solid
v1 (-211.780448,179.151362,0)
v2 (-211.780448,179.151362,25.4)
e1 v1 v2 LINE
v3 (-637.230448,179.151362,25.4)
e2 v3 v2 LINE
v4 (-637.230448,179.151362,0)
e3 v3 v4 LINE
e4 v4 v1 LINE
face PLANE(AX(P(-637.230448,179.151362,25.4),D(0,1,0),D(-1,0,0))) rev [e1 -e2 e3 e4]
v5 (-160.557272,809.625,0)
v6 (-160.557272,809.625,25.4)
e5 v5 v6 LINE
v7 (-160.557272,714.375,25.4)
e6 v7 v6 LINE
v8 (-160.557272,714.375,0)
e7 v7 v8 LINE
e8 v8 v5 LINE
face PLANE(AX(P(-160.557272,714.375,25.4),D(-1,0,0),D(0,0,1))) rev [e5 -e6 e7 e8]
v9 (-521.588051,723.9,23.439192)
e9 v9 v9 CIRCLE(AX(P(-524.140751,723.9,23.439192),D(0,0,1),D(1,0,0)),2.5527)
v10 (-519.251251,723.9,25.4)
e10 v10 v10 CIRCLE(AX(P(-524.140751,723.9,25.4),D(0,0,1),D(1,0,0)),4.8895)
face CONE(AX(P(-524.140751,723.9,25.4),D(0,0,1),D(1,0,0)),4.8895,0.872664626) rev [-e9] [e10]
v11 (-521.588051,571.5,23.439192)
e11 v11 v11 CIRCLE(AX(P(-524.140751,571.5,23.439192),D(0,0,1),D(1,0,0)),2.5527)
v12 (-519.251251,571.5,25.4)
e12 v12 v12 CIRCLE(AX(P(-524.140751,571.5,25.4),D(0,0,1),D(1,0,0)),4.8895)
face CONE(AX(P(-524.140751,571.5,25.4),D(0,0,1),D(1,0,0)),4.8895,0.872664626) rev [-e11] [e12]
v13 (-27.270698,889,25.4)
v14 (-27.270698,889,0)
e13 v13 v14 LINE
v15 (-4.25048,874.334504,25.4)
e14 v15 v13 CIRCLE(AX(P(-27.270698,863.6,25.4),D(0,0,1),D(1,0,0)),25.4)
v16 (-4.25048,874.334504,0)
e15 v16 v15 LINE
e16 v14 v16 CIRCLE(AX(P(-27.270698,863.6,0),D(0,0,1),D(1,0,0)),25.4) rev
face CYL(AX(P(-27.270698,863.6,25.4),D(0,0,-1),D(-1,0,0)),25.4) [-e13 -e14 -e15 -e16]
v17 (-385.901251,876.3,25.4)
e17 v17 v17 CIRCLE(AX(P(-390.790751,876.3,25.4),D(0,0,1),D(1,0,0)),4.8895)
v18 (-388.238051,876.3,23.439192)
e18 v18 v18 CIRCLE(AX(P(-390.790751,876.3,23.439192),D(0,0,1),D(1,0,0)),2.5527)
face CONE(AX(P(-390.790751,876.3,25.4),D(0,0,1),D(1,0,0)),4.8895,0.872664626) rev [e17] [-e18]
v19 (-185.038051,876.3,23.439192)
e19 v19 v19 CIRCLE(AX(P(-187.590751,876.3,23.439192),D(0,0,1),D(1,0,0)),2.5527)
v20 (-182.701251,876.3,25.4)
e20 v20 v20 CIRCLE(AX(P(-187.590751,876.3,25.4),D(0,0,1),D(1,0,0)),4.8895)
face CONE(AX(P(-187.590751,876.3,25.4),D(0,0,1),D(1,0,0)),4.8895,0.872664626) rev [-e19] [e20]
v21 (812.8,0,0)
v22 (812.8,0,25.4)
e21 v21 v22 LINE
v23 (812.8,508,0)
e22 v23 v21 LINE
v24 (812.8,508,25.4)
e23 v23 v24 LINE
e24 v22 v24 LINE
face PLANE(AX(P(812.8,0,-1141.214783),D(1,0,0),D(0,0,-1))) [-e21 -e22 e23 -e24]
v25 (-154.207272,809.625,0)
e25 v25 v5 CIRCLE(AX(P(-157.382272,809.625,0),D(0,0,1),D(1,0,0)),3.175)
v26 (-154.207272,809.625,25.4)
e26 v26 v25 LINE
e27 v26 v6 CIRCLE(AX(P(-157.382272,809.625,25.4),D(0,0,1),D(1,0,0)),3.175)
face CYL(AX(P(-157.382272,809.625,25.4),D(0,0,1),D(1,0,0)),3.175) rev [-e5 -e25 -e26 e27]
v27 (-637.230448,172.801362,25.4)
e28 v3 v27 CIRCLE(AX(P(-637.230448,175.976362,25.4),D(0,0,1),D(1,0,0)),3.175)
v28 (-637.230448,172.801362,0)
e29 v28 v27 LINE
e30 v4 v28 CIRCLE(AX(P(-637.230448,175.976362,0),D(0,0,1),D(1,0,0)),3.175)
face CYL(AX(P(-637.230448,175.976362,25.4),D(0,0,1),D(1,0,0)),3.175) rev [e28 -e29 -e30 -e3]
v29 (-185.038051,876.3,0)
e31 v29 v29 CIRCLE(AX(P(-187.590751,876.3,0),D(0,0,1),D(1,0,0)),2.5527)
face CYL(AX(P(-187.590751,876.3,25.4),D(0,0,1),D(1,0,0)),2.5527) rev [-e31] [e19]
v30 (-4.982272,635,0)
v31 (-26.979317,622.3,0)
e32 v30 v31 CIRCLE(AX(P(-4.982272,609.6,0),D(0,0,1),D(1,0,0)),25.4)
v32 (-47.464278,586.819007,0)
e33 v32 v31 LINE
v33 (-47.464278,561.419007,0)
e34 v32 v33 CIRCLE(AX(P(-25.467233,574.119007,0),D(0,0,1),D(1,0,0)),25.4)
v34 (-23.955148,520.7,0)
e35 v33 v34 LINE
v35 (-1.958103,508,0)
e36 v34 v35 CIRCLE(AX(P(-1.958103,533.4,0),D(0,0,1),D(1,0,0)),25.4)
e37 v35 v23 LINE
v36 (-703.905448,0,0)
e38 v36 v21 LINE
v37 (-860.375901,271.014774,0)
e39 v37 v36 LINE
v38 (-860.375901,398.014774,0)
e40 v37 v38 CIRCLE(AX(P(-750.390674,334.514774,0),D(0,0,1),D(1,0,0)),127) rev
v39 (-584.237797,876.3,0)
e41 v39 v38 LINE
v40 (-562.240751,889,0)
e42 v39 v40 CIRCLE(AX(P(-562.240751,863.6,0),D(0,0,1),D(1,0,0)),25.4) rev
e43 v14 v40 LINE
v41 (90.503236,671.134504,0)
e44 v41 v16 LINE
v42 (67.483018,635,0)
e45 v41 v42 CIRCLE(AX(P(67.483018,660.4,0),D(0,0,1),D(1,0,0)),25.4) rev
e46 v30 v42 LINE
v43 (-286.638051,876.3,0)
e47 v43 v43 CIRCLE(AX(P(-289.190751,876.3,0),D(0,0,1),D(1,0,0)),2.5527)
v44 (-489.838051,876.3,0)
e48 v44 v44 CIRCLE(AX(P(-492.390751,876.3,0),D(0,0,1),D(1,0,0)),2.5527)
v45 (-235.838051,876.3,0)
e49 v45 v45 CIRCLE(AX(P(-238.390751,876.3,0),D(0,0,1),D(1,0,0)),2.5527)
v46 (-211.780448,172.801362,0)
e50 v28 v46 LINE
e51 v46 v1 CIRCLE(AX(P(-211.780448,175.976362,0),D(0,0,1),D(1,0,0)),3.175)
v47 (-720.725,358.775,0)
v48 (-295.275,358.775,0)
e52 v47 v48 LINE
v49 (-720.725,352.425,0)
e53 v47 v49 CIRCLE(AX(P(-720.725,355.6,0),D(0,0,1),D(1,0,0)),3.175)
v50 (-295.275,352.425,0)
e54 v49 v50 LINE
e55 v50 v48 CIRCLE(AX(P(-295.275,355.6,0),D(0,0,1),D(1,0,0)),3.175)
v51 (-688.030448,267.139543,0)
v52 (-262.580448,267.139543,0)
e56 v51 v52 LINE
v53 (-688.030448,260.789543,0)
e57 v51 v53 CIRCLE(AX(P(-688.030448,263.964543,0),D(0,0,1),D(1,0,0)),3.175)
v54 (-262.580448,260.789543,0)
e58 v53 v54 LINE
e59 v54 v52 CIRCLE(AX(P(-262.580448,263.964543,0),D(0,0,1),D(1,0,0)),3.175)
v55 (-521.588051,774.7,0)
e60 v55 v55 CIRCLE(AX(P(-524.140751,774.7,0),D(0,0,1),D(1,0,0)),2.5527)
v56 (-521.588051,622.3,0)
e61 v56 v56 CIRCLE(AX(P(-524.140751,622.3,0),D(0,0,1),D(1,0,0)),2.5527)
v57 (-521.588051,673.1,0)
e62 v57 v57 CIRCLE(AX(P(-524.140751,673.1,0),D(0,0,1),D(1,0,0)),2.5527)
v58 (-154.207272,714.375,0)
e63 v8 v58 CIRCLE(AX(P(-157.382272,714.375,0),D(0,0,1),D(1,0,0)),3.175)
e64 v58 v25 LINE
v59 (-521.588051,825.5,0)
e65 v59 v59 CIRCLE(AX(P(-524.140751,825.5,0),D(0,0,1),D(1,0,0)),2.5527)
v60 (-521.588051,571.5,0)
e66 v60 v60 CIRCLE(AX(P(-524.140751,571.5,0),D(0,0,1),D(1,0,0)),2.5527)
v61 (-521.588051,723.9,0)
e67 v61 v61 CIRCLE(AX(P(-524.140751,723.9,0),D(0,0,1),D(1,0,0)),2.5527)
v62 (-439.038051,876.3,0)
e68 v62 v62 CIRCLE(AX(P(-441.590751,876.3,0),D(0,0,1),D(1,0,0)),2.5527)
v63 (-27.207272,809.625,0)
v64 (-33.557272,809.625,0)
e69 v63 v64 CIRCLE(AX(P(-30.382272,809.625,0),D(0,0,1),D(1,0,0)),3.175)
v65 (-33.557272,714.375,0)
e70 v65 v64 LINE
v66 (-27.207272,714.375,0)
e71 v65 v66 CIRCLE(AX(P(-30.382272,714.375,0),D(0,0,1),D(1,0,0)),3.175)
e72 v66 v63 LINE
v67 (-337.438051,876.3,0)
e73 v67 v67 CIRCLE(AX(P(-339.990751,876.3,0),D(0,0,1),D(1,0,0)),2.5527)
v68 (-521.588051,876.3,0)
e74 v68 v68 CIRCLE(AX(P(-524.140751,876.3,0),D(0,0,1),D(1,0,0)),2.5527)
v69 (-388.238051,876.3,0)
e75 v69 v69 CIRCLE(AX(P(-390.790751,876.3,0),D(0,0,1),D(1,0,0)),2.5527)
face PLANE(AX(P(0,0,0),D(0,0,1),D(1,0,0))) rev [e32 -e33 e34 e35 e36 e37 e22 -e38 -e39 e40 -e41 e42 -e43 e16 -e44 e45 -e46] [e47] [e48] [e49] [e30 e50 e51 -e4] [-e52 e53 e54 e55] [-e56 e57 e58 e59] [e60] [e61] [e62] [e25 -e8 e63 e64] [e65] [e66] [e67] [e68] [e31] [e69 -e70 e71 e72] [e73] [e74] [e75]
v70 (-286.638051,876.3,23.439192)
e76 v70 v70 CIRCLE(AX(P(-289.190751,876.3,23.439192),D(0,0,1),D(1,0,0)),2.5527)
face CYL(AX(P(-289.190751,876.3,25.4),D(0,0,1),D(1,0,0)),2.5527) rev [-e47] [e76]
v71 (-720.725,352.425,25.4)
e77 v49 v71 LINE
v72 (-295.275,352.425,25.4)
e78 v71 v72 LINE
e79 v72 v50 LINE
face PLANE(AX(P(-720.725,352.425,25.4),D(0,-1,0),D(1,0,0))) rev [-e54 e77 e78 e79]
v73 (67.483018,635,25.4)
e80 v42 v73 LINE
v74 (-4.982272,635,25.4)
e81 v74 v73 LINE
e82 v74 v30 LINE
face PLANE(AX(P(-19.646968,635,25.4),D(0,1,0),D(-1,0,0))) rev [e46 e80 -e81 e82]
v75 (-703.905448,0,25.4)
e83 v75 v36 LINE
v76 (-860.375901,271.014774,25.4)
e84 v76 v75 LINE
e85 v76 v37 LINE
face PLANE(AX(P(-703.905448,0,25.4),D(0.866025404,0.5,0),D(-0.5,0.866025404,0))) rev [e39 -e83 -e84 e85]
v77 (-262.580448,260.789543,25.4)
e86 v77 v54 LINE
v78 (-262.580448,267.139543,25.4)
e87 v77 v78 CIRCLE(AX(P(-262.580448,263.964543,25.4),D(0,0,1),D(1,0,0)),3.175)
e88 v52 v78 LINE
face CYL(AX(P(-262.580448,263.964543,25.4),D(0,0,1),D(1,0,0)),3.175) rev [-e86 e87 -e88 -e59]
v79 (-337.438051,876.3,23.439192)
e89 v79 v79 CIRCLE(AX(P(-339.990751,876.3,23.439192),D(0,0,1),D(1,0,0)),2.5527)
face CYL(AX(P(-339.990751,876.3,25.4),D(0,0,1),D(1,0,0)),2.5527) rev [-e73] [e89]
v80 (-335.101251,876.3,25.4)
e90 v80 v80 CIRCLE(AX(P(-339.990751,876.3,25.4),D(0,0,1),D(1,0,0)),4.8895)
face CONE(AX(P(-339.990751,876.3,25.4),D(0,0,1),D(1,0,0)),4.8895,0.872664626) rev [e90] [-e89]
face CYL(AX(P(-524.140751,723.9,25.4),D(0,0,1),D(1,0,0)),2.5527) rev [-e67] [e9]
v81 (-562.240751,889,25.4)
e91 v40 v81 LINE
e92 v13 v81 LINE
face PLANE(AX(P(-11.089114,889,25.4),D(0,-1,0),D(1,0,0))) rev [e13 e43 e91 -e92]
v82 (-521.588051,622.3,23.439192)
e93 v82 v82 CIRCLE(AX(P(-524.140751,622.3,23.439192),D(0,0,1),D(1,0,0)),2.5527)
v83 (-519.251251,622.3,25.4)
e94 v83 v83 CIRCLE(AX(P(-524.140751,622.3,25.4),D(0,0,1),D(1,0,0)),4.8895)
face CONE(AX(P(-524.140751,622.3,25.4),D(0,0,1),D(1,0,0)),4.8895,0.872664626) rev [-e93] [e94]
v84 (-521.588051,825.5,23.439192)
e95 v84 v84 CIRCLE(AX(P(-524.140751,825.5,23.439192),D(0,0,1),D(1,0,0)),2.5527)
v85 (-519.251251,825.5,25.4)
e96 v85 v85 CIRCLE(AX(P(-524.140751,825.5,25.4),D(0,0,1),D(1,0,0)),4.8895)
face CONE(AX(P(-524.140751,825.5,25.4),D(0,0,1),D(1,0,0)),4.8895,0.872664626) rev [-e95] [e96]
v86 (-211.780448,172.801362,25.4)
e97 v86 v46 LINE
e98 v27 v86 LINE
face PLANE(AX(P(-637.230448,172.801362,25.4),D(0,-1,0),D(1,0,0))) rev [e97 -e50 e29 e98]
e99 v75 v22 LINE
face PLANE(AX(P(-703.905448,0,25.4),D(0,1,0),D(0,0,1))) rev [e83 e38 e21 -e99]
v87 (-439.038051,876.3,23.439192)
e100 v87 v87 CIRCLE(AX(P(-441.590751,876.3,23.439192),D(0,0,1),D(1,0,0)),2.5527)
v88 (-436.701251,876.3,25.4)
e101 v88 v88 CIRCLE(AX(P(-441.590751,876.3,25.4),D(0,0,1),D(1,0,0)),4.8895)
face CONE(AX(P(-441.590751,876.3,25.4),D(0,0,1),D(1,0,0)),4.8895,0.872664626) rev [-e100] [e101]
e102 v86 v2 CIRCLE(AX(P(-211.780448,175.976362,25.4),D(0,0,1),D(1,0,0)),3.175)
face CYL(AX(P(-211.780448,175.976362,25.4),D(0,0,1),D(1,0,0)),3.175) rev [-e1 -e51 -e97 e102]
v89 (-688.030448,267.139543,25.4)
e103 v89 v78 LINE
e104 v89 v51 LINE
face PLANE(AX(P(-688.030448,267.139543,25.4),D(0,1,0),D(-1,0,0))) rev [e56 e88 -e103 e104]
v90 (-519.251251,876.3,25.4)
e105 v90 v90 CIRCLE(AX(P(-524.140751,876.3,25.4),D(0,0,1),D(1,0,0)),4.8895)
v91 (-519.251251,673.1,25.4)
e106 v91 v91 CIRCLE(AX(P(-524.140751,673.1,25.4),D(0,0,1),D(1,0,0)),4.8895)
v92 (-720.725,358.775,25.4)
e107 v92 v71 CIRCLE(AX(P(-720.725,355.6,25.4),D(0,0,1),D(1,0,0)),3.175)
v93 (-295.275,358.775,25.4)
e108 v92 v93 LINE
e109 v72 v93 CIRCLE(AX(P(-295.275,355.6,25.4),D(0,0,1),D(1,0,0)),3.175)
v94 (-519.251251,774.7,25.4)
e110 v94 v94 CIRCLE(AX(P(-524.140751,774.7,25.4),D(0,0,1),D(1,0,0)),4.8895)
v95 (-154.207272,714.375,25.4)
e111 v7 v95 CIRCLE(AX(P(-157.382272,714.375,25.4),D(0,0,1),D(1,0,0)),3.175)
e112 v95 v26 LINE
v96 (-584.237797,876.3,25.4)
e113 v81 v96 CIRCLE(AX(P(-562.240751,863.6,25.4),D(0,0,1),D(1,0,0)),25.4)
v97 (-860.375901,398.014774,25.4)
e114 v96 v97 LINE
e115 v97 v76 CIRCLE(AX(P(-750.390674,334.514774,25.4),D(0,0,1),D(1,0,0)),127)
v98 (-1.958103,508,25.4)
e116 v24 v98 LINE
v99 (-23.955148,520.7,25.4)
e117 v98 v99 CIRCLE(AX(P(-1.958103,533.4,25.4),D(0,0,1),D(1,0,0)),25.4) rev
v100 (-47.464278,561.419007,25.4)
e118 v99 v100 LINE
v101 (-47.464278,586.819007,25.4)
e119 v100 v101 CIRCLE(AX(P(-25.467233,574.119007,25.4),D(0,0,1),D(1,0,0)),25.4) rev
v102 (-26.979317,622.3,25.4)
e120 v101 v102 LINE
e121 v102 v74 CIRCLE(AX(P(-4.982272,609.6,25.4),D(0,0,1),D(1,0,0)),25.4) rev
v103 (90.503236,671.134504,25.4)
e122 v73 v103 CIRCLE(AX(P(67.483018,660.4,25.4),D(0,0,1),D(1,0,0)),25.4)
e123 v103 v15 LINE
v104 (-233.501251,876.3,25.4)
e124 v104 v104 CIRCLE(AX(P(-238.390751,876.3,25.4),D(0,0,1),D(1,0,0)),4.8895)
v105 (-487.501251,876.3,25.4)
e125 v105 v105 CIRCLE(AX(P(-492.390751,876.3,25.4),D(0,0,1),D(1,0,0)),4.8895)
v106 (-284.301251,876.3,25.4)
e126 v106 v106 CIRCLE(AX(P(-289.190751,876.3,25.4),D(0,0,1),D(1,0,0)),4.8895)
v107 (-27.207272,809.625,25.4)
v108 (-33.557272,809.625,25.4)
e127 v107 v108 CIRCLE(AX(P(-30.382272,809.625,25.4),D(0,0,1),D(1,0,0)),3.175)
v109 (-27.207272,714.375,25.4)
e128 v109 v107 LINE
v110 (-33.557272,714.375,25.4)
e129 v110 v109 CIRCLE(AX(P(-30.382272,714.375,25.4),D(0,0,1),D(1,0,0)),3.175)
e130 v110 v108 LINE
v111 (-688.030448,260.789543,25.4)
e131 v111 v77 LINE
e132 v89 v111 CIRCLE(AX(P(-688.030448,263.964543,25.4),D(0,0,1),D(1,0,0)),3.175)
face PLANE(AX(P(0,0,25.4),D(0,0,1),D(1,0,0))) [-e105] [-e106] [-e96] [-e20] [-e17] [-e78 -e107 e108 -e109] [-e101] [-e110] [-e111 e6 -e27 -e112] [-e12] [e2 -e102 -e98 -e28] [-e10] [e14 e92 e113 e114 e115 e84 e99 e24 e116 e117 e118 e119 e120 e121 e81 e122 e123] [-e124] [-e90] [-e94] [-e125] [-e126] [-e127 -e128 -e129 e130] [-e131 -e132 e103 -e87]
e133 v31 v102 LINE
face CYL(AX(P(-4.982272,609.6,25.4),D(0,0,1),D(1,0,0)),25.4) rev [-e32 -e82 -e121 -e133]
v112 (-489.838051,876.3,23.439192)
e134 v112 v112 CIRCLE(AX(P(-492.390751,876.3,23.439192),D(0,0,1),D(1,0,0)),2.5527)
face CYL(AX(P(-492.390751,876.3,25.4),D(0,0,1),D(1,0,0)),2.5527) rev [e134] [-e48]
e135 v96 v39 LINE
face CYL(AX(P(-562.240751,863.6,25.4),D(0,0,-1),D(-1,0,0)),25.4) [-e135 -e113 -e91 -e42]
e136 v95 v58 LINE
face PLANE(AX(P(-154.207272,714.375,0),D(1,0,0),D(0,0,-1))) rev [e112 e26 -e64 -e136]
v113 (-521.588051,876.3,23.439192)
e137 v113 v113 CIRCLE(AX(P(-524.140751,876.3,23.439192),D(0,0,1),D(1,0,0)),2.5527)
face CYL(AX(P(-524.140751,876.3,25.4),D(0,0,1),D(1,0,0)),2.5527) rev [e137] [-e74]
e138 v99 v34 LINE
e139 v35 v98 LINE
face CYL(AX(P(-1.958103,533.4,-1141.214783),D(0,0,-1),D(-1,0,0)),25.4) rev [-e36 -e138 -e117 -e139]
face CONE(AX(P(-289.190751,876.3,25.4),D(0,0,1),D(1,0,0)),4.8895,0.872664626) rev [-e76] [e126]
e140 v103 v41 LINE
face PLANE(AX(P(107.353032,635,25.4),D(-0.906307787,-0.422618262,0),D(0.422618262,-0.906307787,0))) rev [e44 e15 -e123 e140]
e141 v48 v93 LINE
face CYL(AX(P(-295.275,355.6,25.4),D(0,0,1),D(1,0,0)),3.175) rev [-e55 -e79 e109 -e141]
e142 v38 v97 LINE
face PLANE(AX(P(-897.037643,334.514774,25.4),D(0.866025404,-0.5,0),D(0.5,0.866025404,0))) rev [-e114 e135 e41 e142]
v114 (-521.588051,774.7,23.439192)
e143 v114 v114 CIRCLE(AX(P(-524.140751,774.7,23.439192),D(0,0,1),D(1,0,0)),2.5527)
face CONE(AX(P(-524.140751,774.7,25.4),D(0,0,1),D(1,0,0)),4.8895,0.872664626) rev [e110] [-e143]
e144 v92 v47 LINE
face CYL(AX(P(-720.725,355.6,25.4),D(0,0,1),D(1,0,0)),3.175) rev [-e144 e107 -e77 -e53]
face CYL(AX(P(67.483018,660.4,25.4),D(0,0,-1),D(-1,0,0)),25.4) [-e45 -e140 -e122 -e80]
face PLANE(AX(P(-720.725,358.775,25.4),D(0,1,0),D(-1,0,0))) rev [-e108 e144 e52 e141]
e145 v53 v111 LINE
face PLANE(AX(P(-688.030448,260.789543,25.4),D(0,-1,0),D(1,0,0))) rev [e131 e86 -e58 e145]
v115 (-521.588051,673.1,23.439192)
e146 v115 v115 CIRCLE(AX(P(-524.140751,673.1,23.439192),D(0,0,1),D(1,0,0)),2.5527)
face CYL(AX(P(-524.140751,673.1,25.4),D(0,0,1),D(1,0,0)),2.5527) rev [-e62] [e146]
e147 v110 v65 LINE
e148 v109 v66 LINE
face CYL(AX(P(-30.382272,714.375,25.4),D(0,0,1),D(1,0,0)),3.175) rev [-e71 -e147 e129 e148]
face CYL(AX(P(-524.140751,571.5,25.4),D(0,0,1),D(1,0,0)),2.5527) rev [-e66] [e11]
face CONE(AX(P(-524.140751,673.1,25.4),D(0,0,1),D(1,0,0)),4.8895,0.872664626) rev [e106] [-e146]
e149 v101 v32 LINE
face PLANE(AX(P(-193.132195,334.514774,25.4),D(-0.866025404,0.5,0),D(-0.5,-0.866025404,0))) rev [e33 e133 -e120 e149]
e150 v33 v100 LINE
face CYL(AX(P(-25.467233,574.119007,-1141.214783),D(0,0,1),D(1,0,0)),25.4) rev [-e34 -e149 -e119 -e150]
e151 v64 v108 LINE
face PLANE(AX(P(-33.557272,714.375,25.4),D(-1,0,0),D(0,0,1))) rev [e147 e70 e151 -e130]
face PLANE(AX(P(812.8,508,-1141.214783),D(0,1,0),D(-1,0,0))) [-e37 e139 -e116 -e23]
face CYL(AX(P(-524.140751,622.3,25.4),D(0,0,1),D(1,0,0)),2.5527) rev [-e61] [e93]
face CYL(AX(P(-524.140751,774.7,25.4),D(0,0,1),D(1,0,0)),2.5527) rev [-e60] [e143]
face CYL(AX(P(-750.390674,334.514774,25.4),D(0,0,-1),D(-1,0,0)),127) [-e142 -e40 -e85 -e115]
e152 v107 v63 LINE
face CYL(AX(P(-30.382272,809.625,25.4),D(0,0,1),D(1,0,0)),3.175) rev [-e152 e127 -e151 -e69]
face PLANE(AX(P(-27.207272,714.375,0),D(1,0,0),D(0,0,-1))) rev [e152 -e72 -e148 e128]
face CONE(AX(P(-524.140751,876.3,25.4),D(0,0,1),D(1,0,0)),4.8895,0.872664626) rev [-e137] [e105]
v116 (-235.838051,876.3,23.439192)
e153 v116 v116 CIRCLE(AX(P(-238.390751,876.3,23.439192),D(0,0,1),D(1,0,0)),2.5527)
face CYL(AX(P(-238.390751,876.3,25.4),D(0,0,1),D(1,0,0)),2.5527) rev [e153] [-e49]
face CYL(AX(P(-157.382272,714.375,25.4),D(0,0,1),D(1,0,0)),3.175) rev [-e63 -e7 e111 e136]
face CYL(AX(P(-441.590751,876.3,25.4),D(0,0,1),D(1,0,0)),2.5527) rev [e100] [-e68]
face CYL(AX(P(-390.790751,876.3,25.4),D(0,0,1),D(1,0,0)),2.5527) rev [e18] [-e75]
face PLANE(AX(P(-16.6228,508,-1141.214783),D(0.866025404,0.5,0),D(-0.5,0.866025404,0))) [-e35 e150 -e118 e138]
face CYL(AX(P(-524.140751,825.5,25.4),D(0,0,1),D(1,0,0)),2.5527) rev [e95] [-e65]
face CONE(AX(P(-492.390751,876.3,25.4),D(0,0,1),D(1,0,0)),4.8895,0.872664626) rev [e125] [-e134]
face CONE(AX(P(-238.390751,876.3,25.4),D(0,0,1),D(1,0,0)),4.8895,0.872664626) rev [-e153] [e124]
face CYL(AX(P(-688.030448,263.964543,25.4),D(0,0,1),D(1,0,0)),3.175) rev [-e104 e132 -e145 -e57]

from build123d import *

# Parameters (mm, degrees)
BOSS_EXTRUDE1_DEPTH                                = 25.4
FILLET1_R                                          = 127
FILLET2_R                                          = 25.4
WHEEL_SLOT_DEPTH                                   = 25.4
PEDAL_SLOT_DEPTH                                   = 25.4
BOSS_EXTRUDE2_DEPTH                                = 25.4
FILLET3_R                                          = 25.4
CSK_FOR_10_FLAT_HEAD_MACHINE_SCREW_100_D           = 5.1054
CSK_FOR_10_FLAT_HEAD_MACHINE_SCREW_100_CSINK_D     = 9.779
CSK_FOR_10_FLAT_HEAD_MACHINE_SCREW_100_CSINK_ANGLE = 100


# Read off the part's stored shape, not the designer's step: wheel slot, pedal slot
with BuildPart() as part:
    # Sketch1 → Boss-Extrude1 (new body)
    with BuildSketch(Plane.XY):
        Polygon((0, 0), (-193.132194655, 334.514773719), (-19.646968374, 635), (107.353031626, 635), (-11.089113546, 889), (-576.905448196, 889), (-897.037642851, 334.514773719), (-703.905448196, 0), align=None)
    extrude(amount=BOSS_EXTRUDE1_DEPTH)

    # Fillet1
    fillet1_edges = [part.edges().sort_by_distance(p)[0] for p in [
        (-897.037642851, 334.514773719, 12.7),
        (-193.132194655, 334.514773719, 12.7),
    ]]
    fillet(fillet1_edges, radius=FILLET1_R)

    # Fillet2
    fillet2_edges = [part.edges().sort_by_distance(p)[0] for p in [
        (-576.905448196, 889, 12.7),
        (-11.089113546, 889, 12.7),
        (107.353031626, 635, 12.7),
        (-19.646968374, 635, 12.7),
    ]]
    fillet(fillet2_edges, radius=FILLET2_R)

    # wheel slot outline → wheel slot (cut)
    with BuildSketch(Plane.XY):
        with BuildLine():
            Line((-154.207271537, 714.375), (-154.207271537, 809.625))
            ThreePointArc((-154.207271537, 809.625), (-157.382271537, 812.8), (-160.557271537, 809.625))
            Line((-160.557271537, 809.625), (-160.557271537, 714.375))
            ThreePointArc((-160.557271537, 714.375), (-157.382271537, 711.2), (-154.207271537, 714.375))
        make_face()
        with BuildLine():
            Line((-27.207271537, 714.375), (-27.207271537, 809.625))
            ThreePointArc((-27.207271537, 809.625), (-30.382271537, 812.8), (-33.557271537, 809.625))
            Line((-33.557271537, 809.625), (-33.557271537, 714.375))
            ThreePointArc((-33.557271537, 714.375), (-30.382271537, 711.2), (-27.207271537, 714.375))
        make_face()
    extrude(amount=WHEEL_SLOT_DEPTH, mode=Mode.SUBTRACT)

    # pedal slot outline → pedal slot (cut)
    with BuildSketch(Plane.XY):
        with BuildLine():
            Line((-720.725, 352.425), (-295.275, 352.425))
            ThreePointArc((-295.275, 352.425), (-292.1, 355.6), (-295.275, 358.775))
            Line((-295.275, 358.775), (-720.725, 358.775))
            ThreePointArc((-720.725, 358.775), (-723.9, 355.6), (-720.725, 352.425))
        make_face()
        with BuildLine():
            Line((-688.030448196, 260.789543073), (-262.580448196, 260.789543073))
            ThreePointArc((-262.580448196, 260.789543073), (-259.405448196, 263.964543073), (-262.580448196, 267.139543073))
            Line((-262.580448196, 267.139543073), (-688.030448196, 267.139543073))
            ThreePointArc((-688.030448196, 267.139543073), (-691.205448196, 263.964543073), (-688.030448196, 260.789543073))
        make_face()
        with BuildLine():
            Line((-637.230448196, 172.801362049), (-211.780448196, 172.801362049))
            ThreePointArc((-211.780448196, 172.801362049), (-208.605448196, 175.976362049), (-211.780448196, 179.151362049))
            Line((-211.780448196, 179.151362049), (-637.230448196, 179.151362049))
            ThreePointArc((-637.230448196, 179.151362049), (-640.405448196, 175.976362049), (-637.230448196, 172.801362049))
        make_face()
    extrude(amount=PEDAL_SLOT_DEPTH, mode=Mode.SUBTRACT)

    # Sketch6 → Boss-Extrude2 (add)
    with BuildSketch(Plane.XY.offset(25.4)):
        with BuildLine():
            Line((0, 0), (812.8, 0))
            Line((812.8, 0), (812.8, 508))
            Line((812.8, 508), (-16.622799945, 508))
            Line((-16.622799945, 508), (-54.796626253, 574.119006685))
            Line((-54.796626253, 574.119006685), (-156.470452561, 398.014773719))
            ThreePointArc((-156.470452561, 398.014773719), (-173.485226281, 334.514773719), (-156.470452561, 271.014773719))
            Line((-156.470452561, 271.014773719), (0, 0))
        make_face()
    extrude(amount=-BOSS_EXTRUDE2_DEPTH)

    # Fillet3
    fillet3_edges = [part.edges().sort_by_distance(p)[0] for p in [
        (-54.796626253, 574.119006685, 12.7),
        (-16.622799945, 508, 12.7),
    ]]
    fillet(fillet3_edges, radius=FILLET3_R)

    # CSK for #10 Flat Head Machine Screw (100)1 (through all)
    with Locations(Plane.XY.offset(25.4)):
        with Locations((-524.140751359, 876.3), (-524.140751359, 825.5), (-492.390751359, 876.3), (-441.590751359, 876.3), (-390.790751359, 876.3), (-339.990751359, 876.3), (-289.190751359, 876.3), (-238.390751359, 876.3), (-524.140751359, 774.7), (-524.140751359, 723.9), (-524.140751359, 673.1), (-524.140751359, 622.3), (-524.140751359, 571.5), (-187.590751359, 876.3)):
            CounterSinkHole(CSK_FOR_10_FLAT_HEAD_MACHINE_SCREW_100_D / 2, CSK_FOR_10_FLAT_HEAD_MACHINE_SCREW_100_CSINK_D / 2, counter_sink_angle=CSK_FOR_10_FLAT_HEAD_MACHINE_SCREW_100_CSINK_ANGLE)


solid = part.part
